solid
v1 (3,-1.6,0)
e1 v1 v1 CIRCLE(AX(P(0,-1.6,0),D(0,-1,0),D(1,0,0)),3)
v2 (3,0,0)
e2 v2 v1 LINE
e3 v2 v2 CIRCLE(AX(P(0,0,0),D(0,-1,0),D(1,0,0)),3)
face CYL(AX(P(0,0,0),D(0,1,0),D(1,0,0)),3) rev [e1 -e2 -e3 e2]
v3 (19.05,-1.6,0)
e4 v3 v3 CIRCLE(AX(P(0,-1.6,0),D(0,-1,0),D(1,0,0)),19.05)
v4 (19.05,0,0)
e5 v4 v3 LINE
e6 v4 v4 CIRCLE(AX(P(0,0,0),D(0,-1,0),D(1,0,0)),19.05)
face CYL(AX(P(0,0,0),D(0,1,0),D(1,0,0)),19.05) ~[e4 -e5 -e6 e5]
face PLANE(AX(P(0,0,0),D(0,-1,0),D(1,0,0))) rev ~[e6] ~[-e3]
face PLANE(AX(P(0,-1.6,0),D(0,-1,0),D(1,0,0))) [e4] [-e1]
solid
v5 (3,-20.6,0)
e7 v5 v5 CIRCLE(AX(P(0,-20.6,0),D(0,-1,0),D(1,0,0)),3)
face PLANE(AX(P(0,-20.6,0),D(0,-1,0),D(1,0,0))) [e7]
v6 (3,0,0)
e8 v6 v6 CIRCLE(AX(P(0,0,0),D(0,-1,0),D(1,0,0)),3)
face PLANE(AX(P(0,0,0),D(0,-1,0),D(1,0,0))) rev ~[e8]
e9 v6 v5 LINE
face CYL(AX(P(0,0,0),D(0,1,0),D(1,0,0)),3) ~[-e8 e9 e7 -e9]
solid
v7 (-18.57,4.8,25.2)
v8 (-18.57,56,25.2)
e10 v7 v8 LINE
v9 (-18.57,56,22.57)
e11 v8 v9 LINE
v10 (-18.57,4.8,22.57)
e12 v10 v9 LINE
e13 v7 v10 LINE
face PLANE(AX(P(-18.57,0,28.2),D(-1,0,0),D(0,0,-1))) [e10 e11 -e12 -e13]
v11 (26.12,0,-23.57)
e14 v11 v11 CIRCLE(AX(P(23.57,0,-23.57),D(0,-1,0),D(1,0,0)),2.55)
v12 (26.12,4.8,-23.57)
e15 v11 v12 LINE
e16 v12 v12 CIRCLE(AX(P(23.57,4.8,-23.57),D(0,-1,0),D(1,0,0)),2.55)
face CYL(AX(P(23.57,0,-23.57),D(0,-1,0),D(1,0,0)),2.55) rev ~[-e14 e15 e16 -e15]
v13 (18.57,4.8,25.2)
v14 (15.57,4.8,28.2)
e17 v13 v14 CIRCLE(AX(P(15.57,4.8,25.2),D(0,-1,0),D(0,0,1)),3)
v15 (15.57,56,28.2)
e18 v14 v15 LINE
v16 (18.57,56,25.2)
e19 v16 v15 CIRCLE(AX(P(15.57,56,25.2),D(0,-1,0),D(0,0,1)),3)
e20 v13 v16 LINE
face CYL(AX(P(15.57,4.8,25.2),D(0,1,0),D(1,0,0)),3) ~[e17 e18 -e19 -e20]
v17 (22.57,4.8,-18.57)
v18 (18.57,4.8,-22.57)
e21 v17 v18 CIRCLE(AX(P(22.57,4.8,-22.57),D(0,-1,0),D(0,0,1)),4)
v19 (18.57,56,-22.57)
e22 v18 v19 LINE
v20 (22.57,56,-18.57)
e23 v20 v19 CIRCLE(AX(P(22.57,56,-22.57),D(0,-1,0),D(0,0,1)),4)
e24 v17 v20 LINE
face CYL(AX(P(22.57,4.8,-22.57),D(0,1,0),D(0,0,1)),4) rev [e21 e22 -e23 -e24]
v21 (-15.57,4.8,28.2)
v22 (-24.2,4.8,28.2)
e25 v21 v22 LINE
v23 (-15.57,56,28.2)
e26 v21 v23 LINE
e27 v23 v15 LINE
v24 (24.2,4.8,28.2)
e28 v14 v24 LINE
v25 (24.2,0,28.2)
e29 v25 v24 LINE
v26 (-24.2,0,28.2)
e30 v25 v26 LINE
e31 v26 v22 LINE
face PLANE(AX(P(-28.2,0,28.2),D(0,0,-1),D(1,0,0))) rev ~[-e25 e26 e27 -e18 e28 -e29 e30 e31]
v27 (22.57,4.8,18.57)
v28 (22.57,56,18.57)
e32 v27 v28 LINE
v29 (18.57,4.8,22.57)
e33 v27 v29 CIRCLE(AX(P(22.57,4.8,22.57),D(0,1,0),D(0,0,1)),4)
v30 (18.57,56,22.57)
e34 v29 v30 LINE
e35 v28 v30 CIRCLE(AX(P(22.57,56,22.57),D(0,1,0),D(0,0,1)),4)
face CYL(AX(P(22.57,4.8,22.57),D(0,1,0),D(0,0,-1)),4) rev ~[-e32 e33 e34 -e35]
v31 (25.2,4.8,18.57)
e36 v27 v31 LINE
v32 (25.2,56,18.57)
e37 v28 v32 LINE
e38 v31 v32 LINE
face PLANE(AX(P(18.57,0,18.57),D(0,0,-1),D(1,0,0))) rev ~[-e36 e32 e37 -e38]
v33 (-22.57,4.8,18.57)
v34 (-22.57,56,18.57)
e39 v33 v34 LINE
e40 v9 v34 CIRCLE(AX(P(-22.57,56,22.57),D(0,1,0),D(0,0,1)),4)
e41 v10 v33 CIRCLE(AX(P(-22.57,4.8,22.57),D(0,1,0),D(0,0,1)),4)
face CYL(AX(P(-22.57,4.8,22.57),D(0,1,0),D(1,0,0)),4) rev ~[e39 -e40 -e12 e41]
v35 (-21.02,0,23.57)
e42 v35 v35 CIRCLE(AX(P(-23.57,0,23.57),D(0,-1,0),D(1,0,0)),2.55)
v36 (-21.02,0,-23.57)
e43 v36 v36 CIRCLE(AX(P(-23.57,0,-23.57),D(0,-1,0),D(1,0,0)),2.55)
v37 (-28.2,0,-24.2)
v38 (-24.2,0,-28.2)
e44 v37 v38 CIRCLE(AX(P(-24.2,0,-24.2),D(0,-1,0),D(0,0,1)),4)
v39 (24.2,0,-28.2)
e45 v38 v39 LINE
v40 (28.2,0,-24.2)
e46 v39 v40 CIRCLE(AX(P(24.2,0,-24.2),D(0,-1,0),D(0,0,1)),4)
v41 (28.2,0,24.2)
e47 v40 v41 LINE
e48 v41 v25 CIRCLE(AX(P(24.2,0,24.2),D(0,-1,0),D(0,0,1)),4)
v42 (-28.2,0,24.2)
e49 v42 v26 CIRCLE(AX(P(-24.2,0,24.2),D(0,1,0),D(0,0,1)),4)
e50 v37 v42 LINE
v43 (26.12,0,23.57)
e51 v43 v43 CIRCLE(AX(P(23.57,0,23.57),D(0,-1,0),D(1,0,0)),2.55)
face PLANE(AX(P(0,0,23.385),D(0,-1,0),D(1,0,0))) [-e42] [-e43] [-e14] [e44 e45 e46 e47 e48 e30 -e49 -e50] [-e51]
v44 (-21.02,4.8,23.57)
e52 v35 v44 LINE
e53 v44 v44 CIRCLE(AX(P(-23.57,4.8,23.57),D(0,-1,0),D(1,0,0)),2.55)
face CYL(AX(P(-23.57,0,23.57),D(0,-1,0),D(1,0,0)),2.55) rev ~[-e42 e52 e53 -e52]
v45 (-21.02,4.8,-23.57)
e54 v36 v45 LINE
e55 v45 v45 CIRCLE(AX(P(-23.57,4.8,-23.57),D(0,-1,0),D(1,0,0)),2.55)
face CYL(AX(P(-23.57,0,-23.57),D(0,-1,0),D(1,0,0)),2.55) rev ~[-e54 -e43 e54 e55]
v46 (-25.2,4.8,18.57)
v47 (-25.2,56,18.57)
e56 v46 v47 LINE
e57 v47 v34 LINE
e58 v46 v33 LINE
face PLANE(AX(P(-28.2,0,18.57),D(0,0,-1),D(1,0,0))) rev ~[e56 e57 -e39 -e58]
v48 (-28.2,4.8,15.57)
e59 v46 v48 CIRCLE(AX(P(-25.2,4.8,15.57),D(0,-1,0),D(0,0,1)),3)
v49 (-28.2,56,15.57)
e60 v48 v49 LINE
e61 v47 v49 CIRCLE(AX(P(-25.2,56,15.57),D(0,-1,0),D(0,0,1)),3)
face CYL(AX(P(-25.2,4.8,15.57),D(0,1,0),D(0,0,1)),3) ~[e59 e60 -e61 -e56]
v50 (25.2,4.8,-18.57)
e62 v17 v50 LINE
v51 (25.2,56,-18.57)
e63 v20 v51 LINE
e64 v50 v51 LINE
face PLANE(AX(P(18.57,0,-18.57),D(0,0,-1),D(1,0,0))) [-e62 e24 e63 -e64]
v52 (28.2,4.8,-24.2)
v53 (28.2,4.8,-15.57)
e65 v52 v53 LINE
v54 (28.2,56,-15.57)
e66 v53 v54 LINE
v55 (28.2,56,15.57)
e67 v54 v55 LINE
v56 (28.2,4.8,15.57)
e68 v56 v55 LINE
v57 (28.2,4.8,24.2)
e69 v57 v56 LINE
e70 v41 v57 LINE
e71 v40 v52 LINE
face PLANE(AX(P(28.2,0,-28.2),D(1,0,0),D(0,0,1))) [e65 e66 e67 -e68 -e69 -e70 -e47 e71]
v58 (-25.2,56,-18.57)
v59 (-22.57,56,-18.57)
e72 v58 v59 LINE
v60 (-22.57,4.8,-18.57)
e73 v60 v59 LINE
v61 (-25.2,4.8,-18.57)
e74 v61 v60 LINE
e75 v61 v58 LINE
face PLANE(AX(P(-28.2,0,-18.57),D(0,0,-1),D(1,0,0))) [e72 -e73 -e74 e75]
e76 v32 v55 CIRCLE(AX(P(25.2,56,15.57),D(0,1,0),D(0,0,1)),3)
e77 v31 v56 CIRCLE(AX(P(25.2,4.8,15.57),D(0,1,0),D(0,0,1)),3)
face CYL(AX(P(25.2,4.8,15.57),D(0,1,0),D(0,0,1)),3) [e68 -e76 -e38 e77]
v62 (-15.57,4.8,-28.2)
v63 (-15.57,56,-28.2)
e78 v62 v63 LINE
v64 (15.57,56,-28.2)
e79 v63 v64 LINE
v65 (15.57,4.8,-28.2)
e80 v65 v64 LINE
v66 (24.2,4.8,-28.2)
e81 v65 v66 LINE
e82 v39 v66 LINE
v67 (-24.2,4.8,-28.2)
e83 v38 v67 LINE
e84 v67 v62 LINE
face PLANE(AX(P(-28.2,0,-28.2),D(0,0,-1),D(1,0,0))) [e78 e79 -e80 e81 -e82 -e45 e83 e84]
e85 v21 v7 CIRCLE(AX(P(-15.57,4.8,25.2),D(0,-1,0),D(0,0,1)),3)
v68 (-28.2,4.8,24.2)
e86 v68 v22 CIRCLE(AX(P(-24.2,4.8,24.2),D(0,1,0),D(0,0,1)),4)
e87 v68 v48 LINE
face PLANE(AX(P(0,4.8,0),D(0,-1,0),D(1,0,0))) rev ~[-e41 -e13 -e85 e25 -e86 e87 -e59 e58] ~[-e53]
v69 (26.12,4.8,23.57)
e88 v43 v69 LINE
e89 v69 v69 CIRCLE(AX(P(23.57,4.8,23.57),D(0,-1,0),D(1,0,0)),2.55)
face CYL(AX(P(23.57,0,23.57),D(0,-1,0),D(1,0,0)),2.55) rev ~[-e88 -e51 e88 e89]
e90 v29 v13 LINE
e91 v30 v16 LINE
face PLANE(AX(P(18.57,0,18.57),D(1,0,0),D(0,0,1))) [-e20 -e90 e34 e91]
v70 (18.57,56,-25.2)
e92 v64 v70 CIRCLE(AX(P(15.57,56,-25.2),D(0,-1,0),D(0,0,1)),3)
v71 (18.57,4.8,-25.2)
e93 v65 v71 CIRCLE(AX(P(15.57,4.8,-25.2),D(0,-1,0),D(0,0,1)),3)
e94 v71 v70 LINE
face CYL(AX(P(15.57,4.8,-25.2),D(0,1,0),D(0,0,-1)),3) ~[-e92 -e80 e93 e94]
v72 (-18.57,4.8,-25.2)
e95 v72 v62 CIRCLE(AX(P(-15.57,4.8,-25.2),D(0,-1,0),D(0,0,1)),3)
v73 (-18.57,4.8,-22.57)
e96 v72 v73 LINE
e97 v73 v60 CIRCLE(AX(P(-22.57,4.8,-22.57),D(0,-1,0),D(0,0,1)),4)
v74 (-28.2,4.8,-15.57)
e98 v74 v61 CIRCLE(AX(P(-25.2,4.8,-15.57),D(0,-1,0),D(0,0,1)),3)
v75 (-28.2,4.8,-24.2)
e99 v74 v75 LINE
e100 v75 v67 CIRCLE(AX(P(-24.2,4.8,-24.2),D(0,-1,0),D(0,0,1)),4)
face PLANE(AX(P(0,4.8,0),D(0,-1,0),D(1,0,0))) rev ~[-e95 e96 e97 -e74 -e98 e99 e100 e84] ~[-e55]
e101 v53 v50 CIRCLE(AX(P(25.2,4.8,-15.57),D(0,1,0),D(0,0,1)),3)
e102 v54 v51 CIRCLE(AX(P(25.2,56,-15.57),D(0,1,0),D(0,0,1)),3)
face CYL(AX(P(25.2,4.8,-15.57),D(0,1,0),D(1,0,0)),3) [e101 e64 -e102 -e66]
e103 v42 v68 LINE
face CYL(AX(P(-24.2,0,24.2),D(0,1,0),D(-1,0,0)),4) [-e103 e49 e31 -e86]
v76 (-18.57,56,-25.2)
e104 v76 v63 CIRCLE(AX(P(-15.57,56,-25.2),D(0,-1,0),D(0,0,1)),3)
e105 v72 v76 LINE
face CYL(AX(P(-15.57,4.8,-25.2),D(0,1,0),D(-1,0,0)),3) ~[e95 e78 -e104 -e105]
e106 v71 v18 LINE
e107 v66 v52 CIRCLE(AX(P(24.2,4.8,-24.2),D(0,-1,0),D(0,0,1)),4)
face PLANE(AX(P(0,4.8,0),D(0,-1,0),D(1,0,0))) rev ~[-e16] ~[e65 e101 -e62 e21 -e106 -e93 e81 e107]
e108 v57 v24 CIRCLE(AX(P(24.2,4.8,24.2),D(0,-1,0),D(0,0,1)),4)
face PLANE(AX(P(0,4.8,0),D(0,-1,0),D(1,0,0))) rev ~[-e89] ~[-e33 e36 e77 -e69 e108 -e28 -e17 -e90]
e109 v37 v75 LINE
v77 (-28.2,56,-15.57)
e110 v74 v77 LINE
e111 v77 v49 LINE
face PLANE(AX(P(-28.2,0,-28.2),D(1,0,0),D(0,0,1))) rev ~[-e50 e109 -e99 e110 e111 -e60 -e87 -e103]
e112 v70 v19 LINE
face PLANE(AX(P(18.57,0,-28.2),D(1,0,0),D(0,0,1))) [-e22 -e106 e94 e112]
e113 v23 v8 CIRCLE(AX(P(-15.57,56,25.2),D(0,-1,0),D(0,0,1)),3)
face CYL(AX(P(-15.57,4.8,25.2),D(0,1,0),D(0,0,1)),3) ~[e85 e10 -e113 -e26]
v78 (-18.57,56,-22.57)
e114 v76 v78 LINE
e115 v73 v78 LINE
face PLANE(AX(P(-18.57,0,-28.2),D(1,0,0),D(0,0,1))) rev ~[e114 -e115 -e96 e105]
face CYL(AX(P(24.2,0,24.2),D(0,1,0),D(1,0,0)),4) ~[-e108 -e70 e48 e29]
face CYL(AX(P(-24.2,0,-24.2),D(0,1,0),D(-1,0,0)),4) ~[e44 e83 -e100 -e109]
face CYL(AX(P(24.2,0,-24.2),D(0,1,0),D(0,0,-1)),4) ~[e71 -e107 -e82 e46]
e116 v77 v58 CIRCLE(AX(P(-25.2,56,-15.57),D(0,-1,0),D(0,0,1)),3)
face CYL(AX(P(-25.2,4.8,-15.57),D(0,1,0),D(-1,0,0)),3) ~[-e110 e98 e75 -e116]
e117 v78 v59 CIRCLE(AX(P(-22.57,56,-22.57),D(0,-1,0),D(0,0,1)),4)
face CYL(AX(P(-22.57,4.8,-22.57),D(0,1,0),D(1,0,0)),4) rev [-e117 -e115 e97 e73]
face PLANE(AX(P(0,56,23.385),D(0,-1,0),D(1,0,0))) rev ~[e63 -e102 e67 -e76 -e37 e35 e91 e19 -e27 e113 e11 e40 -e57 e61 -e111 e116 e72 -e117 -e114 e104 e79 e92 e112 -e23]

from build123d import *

# Parameters (mm, degrees)
F0_W     = 56.4
F0_H     = 56.4
F0_R     = 2.55
F0_R_2   = 19.05
F0_R_3   = 3
F1_DEPTH = 4.8
F2_DEPTH = 1.6
F3_DEPTH = 20.6
F4_R     = 4
F7_W     = 37.14
F7_H     = 9.63
F7_H_2   = 37.14
F7_W_2   = 9.63
F8_DEPTH = 56
F9_R     = 4
F10_R    = 3


# Not quite as in the source:
# - a feature of the source that left no trace in its solid (it failed there, or was rolled back) is left out


with BuildPart() as f1:
    # F0 (on Front) → F1 (new body)
    with BuildSketch(Plane.XZ):
        Rectangle(F0_W, F0_H)
        with Locations((-23.57, -23.57)):
            Circle(F0_R, mode=Mode.SUBTRACT)
        with Locations((23.57, -23.57)):
            Circle(F0_R, mode=Mode.SUBTRACT)
        with Locations((-23.57, 23.57)):
            Circle(F0_R, mode=Mode.SUBTRACT)
        Circle(F0_R_2, mode=Mode.SUBTRACT)
        with Locations((23.57, 23.57)):
            Circle(F0_R, mode=Mode.SUBTRACT)
        Circle(F0_R_2)
        Circle(F0_R_3, mode=Mode.SUBTRACT)
        Circle(F0_R_3)
    extrude(amount=-F1_DEPTH)

    # F4
    f4_edges = [f1.edges().sort_by_distance(p)[0] for p in [
        (-28.2, 2.4, 28.2),
        (28.2, 2.4, 28.2),
        (28.2, 2.4, -28.2),
        (-28.2, 2.4, -28.2),
    ]]
    fillet(f4_edges, radius=F4_R)

    # F7 (on Front) → F8 (join)
    with BuildSketch(Plane.XZ):
        with Locations((0, 23.385)):
            Rectangle(F7_W, F7_H)
        Rectangle(F7_W, F7_H_2)
        with Locations((-23.385, 0)):
            Rectangle(F7_W_2, F7_H_2)
        with Locations((23.385, 0)):
            Rectangle(F7_W_2, F7_H_2)
        with Locations((0, -23.385)):
            Rectangle(F7_W, F7_H)
    extrude(amount=-F8_DEPTH)

    # F9
    f9_edges = [f1.edges().sort_by_distance(p)[0] for p in [
        (18.57, 30.4, 18.57),
        (-18.57, 30.4, 18.57),
        (-18.57, 30.4, -18.57),
        (18.57, 30.4, -18.57),
    ]]
    fillet(f9_edges, radius=F9_R)

    # F10
    f10_edges = [f1.edges().sort_by_distance(p)[0] for p in [
        (18.57, 30.4, 28.2),
        (28.2, 30.4, 18.57),
        (28.2, 30.4, -18.57),
        (18.57, 30.4, -28.2),
        (-18.57, 30.4, -28.2),
        (-28.2, 30.4, -18.57),
        (-28.2, 30.4, 18.57),
        (-18.57, 30.4, 28.2),
    ]]
    fillet(f10_edges, radius=F10_R)


with BuildPart() as f2:
    # F0 (on Front) → F2 (new body)
    with BuildSketch(Plane.XZ):
        Circle(F0_R_2)
        Circle(F0_R_3, mode=Mode.SUBTRACT)
    extrude(amount=F2_DEPTH)


with BuildPart() as f3:
    # F0 (on Front) → F3 (new body)
    with BuildSketch(Plane.XZ):
        Circle(F0_R_3)
    extrude(amount=F3_DEPTH)


solid = Compound([f1.part, f2.part, f3.part])
